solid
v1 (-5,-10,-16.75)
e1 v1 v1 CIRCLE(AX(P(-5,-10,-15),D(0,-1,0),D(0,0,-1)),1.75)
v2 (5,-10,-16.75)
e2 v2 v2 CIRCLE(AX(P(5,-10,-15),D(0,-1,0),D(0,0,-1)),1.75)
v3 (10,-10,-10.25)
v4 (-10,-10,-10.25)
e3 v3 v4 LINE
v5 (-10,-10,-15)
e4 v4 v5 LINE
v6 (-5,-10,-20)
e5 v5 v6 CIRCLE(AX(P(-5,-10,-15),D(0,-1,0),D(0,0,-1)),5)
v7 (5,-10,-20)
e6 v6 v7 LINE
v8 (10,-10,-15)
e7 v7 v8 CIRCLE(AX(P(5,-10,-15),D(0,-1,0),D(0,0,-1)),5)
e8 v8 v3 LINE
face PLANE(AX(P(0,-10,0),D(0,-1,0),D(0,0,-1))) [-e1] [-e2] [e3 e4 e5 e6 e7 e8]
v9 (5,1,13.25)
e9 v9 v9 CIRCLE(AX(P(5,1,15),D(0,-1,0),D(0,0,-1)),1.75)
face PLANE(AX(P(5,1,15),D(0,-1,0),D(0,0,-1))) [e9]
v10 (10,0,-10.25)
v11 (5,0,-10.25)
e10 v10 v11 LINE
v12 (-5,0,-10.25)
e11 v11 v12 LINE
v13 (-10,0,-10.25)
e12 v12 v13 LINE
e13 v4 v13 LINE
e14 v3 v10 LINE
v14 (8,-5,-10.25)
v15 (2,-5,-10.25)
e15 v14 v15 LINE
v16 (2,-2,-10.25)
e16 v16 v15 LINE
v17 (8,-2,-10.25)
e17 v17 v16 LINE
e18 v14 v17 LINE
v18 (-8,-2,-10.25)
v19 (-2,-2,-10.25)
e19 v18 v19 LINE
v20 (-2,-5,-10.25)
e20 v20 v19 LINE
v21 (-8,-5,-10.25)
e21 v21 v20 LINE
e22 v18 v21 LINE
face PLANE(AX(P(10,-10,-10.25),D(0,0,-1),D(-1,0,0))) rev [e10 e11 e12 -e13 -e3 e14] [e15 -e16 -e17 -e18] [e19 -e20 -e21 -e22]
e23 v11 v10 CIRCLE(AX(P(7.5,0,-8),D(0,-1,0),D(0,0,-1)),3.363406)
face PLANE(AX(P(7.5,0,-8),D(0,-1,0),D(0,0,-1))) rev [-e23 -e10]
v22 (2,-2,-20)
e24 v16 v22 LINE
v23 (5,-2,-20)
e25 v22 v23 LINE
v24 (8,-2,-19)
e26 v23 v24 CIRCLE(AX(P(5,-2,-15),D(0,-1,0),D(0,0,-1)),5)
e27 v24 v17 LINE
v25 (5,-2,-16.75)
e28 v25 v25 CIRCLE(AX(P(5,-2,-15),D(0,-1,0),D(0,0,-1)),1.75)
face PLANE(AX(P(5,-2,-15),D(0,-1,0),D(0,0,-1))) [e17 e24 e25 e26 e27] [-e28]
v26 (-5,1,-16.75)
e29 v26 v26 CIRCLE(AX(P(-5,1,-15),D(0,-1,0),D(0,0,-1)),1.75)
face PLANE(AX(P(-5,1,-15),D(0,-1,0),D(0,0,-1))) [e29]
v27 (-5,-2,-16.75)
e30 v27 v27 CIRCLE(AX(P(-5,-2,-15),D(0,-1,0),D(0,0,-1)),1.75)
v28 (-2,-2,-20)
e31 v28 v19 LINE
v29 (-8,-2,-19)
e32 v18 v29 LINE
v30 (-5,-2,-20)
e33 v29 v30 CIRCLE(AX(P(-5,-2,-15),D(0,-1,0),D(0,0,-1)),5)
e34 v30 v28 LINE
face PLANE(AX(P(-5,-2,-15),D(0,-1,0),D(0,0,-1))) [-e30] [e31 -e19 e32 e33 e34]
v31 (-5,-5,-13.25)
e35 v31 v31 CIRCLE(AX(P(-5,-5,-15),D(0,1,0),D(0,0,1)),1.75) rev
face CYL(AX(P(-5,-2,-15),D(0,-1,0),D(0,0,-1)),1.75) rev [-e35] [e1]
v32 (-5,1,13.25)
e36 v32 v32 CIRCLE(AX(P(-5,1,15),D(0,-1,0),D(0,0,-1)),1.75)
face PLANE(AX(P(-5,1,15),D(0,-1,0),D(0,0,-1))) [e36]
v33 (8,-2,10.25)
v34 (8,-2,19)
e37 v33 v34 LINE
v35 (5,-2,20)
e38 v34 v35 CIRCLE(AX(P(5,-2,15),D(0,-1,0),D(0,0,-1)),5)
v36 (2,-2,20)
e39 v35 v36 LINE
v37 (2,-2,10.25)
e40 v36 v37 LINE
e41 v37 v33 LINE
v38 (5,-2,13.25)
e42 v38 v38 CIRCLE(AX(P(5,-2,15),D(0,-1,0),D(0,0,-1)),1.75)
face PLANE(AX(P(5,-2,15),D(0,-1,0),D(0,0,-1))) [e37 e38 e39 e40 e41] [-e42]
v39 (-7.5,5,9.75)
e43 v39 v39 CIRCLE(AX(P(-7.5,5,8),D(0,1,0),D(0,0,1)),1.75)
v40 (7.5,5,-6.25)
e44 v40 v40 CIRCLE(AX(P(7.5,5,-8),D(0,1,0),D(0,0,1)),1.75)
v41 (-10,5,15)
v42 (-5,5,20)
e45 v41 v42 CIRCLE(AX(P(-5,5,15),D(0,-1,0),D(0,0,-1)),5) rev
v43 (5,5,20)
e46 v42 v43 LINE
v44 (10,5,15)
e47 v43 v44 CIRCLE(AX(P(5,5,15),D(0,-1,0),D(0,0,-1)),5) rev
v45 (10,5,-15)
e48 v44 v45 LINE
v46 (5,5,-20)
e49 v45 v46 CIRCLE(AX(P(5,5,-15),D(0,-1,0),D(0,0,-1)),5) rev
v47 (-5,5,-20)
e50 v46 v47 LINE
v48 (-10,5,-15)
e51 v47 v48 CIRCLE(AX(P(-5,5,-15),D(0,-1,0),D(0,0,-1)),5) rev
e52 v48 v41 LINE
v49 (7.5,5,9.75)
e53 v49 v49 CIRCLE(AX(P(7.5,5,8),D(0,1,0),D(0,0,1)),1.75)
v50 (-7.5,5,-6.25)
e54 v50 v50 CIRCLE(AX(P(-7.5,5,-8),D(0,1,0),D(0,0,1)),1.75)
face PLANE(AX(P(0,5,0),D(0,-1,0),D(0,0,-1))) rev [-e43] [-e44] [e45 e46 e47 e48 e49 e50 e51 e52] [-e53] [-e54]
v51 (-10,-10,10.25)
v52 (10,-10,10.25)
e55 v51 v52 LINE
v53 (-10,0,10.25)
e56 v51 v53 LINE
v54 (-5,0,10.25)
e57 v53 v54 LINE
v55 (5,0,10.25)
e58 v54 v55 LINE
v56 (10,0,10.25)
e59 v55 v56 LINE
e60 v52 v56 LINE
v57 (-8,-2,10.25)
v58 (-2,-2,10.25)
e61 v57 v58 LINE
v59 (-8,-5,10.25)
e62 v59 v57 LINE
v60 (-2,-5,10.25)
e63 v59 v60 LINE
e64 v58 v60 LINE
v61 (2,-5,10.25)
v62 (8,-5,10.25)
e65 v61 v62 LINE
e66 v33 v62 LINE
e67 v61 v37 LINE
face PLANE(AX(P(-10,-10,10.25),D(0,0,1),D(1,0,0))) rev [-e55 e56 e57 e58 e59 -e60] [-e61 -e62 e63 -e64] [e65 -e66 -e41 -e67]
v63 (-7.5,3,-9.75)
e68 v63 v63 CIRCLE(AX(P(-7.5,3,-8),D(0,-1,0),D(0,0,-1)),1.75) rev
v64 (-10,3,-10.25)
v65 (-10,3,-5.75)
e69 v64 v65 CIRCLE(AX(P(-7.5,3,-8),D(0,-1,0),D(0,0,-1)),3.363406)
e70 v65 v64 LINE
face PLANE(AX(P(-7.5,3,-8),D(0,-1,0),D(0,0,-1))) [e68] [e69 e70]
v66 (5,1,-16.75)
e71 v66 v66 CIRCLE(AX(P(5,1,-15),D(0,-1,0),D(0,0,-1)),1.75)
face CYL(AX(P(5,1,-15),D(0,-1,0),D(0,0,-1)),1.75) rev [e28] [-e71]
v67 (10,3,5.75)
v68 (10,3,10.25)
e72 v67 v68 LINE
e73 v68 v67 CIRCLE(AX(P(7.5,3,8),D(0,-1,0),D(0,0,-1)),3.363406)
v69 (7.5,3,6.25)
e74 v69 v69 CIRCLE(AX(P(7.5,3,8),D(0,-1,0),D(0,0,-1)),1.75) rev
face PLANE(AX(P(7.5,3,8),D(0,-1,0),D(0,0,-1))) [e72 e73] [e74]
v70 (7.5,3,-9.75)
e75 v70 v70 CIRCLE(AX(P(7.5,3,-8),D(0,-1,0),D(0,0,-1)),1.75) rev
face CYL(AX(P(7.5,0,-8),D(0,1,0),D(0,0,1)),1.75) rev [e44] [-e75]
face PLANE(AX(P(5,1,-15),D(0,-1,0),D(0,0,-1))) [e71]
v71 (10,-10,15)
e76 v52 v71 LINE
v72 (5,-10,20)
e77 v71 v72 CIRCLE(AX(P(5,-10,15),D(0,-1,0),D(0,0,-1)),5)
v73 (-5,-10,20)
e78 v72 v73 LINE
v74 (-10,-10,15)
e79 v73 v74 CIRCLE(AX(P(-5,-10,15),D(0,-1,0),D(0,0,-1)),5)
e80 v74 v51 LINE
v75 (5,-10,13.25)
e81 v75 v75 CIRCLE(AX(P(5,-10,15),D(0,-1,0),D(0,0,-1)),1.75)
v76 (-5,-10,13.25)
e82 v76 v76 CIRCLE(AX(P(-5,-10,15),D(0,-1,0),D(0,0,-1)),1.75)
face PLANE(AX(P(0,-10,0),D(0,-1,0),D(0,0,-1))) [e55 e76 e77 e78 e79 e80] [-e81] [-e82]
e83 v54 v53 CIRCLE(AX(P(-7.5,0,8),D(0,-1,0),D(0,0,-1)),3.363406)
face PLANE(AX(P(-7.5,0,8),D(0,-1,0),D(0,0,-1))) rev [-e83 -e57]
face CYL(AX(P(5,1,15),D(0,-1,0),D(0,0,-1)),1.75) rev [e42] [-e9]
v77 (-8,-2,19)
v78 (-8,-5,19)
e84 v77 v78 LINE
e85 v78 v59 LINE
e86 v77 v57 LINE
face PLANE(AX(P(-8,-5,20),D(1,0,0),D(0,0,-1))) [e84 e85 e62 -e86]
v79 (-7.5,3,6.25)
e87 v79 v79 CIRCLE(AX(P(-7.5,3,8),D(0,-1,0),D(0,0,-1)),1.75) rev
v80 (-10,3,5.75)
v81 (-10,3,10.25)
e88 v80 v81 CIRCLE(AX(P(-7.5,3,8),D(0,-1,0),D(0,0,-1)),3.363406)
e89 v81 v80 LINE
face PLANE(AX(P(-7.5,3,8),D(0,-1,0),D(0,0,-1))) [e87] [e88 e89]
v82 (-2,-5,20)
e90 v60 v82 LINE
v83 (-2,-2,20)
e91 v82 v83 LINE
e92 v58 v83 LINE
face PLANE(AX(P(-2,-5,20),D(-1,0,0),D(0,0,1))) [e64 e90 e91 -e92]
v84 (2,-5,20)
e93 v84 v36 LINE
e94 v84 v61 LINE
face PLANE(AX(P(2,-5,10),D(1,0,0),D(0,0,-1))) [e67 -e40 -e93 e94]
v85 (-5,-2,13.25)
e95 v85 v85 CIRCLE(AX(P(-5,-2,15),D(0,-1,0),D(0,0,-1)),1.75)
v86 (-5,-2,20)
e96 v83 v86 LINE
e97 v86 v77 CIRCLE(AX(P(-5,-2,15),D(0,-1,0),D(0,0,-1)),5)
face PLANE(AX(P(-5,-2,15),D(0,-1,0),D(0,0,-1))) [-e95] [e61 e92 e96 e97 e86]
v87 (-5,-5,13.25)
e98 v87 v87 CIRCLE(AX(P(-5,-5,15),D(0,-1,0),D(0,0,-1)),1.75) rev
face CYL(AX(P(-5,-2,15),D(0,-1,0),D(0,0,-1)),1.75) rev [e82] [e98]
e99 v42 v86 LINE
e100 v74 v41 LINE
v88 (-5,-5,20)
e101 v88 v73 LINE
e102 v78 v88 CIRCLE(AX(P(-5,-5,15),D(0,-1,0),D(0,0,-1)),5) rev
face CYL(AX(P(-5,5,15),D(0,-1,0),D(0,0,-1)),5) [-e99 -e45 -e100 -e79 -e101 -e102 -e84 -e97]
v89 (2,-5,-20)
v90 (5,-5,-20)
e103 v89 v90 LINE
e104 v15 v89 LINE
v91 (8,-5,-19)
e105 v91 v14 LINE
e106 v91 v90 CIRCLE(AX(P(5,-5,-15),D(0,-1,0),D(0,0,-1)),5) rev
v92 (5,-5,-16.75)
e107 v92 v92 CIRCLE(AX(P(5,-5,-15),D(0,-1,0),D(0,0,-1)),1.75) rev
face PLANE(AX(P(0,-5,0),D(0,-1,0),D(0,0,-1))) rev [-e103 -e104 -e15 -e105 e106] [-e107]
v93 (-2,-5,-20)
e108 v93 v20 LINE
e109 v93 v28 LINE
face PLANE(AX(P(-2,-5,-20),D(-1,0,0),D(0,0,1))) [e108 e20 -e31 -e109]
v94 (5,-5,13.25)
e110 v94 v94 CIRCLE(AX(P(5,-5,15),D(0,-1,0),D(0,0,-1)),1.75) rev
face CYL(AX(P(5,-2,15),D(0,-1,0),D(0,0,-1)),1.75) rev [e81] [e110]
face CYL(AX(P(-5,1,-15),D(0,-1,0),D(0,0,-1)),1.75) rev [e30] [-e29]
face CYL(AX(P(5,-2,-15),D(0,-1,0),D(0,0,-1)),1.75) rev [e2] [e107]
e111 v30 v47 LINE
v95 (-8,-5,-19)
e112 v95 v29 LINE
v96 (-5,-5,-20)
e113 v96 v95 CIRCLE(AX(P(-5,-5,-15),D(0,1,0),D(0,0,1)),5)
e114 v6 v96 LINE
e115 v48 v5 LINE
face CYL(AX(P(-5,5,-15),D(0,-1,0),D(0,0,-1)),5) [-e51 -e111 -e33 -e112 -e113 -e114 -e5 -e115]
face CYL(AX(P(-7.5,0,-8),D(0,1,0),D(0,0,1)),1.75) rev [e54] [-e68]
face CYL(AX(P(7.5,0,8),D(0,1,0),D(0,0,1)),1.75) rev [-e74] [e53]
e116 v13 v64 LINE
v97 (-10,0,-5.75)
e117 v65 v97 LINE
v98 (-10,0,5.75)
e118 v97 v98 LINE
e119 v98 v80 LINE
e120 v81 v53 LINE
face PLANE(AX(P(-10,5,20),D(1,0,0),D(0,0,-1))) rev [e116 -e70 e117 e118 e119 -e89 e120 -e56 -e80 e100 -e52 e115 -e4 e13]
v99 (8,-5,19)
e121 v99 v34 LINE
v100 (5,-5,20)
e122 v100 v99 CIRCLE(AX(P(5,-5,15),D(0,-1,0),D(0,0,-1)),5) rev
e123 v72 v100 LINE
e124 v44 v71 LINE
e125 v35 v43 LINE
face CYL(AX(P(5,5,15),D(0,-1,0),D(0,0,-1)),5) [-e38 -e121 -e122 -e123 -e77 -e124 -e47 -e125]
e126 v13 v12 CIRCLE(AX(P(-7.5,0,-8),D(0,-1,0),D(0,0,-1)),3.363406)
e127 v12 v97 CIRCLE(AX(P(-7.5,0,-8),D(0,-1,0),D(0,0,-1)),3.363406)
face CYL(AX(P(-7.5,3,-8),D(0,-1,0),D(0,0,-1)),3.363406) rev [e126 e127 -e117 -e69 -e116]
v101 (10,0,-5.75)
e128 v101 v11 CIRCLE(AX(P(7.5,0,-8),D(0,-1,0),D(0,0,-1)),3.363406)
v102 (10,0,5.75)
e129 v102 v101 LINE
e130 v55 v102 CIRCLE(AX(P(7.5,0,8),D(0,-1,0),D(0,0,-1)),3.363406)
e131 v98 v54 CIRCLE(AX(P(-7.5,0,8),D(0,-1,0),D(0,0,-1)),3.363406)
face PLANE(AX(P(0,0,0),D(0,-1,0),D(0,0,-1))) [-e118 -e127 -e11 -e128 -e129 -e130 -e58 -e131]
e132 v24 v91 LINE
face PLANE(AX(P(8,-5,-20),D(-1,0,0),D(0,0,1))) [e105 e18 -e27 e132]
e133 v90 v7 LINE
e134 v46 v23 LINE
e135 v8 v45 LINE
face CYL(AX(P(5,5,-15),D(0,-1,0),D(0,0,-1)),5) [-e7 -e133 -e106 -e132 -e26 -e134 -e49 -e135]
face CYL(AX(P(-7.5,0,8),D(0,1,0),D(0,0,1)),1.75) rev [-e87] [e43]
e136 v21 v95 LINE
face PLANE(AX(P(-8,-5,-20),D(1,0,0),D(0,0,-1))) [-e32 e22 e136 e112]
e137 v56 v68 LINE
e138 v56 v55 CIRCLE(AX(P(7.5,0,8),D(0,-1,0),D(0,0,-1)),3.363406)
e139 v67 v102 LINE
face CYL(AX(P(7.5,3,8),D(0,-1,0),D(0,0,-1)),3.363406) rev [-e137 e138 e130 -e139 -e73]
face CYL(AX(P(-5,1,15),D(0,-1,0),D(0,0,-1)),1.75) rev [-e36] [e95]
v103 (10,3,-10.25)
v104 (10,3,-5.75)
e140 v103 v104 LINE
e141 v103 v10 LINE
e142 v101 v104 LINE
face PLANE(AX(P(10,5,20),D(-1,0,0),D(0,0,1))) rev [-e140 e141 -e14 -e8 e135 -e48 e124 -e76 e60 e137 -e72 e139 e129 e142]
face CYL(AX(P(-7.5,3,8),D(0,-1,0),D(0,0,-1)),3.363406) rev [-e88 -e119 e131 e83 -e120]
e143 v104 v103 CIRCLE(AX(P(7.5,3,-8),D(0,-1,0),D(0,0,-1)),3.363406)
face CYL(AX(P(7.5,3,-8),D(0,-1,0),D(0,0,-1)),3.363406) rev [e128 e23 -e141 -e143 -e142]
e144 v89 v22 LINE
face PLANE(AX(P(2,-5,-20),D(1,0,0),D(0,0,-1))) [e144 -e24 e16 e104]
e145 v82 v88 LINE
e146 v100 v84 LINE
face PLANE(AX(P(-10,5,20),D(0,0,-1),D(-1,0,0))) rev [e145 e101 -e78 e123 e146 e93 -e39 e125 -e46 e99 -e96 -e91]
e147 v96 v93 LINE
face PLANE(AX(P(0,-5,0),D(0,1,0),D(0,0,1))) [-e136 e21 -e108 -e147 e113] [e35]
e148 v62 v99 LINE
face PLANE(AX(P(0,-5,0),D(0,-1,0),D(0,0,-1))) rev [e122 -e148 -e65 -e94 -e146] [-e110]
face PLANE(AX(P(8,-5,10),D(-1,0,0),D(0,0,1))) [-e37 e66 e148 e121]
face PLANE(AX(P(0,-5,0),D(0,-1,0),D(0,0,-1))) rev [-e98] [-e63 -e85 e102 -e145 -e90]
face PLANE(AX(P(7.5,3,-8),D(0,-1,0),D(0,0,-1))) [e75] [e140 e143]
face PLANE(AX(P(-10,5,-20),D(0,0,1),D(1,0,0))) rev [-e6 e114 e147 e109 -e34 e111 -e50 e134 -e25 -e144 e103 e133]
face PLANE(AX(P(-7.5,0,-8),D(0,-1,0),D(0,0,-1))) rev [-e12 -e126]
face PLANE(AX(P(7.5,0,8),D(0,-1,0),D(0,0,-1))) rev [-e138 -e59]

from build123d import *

# Parameters (mm, degrees)
SKETCH1_W           = 20
SKETCH1_H           = 40
BOSS_EXTRUDE1_DEPTH = 5
SKETCH2_W           = 20
SKETCH2_H           = 9.75
BOSS_EXTRUDE2_DEPTH = 10
SKETCH3_R           = 1.75
CUT_EXTRUDE1_DEPTH  = 5
SKETCH4_R           = 3.363406012
CUT_EXTRUDE2_DEPTH  = 3
SKETCH5_R           = 1.75
CUT_EXTRUDE3_DEPTH  = 8
SKETCH6_W           = 6
SKETCH6_H           = 10
CUT_EXTRUDE4_DEPTH  = 3
SKETCH7_R           = 1.75
CUT_EXTRUDE5_DEPTH  = 3
FILLET1_R           = 5


with BuildPart() as part:
    # Sketch1 → Boss-Extrude1 (new body)
    with BuildSketch(Plane(origin=(0, 0, 0), x_dir=(1, 0, 0), z_dir=(0, 1, 0))):
        Rectangle(SKETCH1_W, SKETCH1_H)
    extrude(amount=BOSS_EXTRUDE1_DEPTH)

    # Sketch2 → Boss-Extrude2 (add)
    with BuildSketch(Plane.XZ):
        with Locations((0, 15.125)):
            Rectangle(SKETCH2_W, SKETCH2_H)
        with Locations((0, -15.125)):
            Rectangle(SKETCH2_W, SKETCH2_H)
    extrude(amount=BOSS_EXTRUDE2_DEPTH)

    # Sketch3 → Cut-Extrude1 (cut)
    with BuildSketch(Plane(origin=(0, 5, 0), x_dir=(1, 0, 0), z_dir=(0, 1, 0))):
        with Locations(Location((-7.5, -8, 0), (0, 0, 270))):
            Circle(SKETCH3_R)
        with Locations(Location((-7.5, 8, 0), (0, 0, 270))):
            Circle(SKETCH3_R)
        with Locations(Location((7.5, -8, 0), (0, 0, 270))):
            Circle(SKETCH3_R)
        with Locations(Location((7.5, 8, 0), (0, 0, 270))):
            Circle(SKETCH3_R)
    extrude(amount=-CUT_EXTRUDE1_DEPTH, mode=Mode.SUBTRACT)

    # Sketch4 → Cut-Extrude2 (cut)
    with BuildSketch(Plane.XZ):
        with Locations((7.5, 8)):
            Circle(SKETCH4_R)
        with Locations((-7.5, 8)):
            Circle(SKETCH4_R)
        with Locations((-7.5, -8)):
            Circle(SKETCH4_R)
        with Locations((7.5, -8)):
            Circle(SKETCH4_R)
    extrude(amount=-CUT_EXTRUDE2_DEPTH, mode=Mode.SUBTRACT)

    # Sketch5 → Cut-Extrude3 (cut)
    with BuildSketch(Plane.XZ.offset(10)):
        with Locations(Location((-5, -15, 0), (0, 0, 270))):
            Circle(SKETCH5_R)
        with Locations(Location((5, -15, 0), (0, 0, 270))):
            Circle(SKETCH5_R)
        with Locations(Location((-5, 15, 0), (0, 0, 270))):
            Circle(SKETCH5_R)
        with Locations(Location((5, 15, 0), (0, 0, 270))):
            Circle(SKETCH5_R)
    extrude(amount=-CUT_EXTRUDE3_DEPTH, mode=Mode.SUBTRACT)

    # Sketch6 → Cut-Extrude4 (cut)
    with BuildSketch(Plane.XZ.offset(2)):
        with Locations((-5, -15)):
            Rectangle(SKETCH6_W, SKETCH6_H)
        with Locations((5, -15)):
            Rectangle(SKETCH6_W, SKETCH6_H)
        with Locations((5, 15)):
            Rectangle(SKETCH6_W, SKETCH6_H)
        with Locations((-5, 15)):
            Rectangle(SKETCH6_W, SKETCH6_H)
    extrude(amount=CUT_EXTRUDE4_DEPTH, mode=Mode.SUBTRACT)

    # Sketch7 → Cut-Extrude5 (cut)
    with BuildSketch(Plane.XZ.offset(2)):
        with Locations(Location((-5, -15, 0), (0, 0, 270))):
            Circle(SKETCH7_R)
        with Locations(Location((5, -15, 0), (0, 0, 270))):
            Circle(SKETCH7_R)
        with Locations(Location((5, 15, 0), (0, 0, 270))):
            Circle(SKETCH7_R)
        with Locations(Location((-5, 15, 0), (0, 0, 270))):
            Circle(SKETCH7_R)
    extrude(amount=-CUT_EXTRUDE5_DEPTH, mode=Mode.SUBTRACT)

    # Fillet1
    # the kernel refuses this fillet: 5 mm, written as the material it takes off along each edge
    with BuildSketch(Plane(origin=(-10, 17.5, -20), x_dir=(0, 0, 1), z_dir=(0, -1, 0)), Plane(origin=(10, -22.5, -20), x_dir=(0, 0, 1), z_dir=(0, 1, 0)), Plane(origin=(-10, 17.5, 20), x_dir=(1, 0, 0), z_dir=(0, -1, 0)), Plane(origin=(10, -22.5, 20), x_dir=(-1, 0, 0), z_dir=(0, 1, 0))) as fillet1_piece_1:
        with BuildLine():
            CenterArc((FILLET1_R, -FILLET1_R), FILLET1_R, 90, 90)
            Line((0, -FILLET1_R), (0, 0))
            Line((0, 0), (FILLET1_R, 0))
        make_face()
    extrude(amount=40, mode=Mode.SUBTRACT)


solid = part.part
